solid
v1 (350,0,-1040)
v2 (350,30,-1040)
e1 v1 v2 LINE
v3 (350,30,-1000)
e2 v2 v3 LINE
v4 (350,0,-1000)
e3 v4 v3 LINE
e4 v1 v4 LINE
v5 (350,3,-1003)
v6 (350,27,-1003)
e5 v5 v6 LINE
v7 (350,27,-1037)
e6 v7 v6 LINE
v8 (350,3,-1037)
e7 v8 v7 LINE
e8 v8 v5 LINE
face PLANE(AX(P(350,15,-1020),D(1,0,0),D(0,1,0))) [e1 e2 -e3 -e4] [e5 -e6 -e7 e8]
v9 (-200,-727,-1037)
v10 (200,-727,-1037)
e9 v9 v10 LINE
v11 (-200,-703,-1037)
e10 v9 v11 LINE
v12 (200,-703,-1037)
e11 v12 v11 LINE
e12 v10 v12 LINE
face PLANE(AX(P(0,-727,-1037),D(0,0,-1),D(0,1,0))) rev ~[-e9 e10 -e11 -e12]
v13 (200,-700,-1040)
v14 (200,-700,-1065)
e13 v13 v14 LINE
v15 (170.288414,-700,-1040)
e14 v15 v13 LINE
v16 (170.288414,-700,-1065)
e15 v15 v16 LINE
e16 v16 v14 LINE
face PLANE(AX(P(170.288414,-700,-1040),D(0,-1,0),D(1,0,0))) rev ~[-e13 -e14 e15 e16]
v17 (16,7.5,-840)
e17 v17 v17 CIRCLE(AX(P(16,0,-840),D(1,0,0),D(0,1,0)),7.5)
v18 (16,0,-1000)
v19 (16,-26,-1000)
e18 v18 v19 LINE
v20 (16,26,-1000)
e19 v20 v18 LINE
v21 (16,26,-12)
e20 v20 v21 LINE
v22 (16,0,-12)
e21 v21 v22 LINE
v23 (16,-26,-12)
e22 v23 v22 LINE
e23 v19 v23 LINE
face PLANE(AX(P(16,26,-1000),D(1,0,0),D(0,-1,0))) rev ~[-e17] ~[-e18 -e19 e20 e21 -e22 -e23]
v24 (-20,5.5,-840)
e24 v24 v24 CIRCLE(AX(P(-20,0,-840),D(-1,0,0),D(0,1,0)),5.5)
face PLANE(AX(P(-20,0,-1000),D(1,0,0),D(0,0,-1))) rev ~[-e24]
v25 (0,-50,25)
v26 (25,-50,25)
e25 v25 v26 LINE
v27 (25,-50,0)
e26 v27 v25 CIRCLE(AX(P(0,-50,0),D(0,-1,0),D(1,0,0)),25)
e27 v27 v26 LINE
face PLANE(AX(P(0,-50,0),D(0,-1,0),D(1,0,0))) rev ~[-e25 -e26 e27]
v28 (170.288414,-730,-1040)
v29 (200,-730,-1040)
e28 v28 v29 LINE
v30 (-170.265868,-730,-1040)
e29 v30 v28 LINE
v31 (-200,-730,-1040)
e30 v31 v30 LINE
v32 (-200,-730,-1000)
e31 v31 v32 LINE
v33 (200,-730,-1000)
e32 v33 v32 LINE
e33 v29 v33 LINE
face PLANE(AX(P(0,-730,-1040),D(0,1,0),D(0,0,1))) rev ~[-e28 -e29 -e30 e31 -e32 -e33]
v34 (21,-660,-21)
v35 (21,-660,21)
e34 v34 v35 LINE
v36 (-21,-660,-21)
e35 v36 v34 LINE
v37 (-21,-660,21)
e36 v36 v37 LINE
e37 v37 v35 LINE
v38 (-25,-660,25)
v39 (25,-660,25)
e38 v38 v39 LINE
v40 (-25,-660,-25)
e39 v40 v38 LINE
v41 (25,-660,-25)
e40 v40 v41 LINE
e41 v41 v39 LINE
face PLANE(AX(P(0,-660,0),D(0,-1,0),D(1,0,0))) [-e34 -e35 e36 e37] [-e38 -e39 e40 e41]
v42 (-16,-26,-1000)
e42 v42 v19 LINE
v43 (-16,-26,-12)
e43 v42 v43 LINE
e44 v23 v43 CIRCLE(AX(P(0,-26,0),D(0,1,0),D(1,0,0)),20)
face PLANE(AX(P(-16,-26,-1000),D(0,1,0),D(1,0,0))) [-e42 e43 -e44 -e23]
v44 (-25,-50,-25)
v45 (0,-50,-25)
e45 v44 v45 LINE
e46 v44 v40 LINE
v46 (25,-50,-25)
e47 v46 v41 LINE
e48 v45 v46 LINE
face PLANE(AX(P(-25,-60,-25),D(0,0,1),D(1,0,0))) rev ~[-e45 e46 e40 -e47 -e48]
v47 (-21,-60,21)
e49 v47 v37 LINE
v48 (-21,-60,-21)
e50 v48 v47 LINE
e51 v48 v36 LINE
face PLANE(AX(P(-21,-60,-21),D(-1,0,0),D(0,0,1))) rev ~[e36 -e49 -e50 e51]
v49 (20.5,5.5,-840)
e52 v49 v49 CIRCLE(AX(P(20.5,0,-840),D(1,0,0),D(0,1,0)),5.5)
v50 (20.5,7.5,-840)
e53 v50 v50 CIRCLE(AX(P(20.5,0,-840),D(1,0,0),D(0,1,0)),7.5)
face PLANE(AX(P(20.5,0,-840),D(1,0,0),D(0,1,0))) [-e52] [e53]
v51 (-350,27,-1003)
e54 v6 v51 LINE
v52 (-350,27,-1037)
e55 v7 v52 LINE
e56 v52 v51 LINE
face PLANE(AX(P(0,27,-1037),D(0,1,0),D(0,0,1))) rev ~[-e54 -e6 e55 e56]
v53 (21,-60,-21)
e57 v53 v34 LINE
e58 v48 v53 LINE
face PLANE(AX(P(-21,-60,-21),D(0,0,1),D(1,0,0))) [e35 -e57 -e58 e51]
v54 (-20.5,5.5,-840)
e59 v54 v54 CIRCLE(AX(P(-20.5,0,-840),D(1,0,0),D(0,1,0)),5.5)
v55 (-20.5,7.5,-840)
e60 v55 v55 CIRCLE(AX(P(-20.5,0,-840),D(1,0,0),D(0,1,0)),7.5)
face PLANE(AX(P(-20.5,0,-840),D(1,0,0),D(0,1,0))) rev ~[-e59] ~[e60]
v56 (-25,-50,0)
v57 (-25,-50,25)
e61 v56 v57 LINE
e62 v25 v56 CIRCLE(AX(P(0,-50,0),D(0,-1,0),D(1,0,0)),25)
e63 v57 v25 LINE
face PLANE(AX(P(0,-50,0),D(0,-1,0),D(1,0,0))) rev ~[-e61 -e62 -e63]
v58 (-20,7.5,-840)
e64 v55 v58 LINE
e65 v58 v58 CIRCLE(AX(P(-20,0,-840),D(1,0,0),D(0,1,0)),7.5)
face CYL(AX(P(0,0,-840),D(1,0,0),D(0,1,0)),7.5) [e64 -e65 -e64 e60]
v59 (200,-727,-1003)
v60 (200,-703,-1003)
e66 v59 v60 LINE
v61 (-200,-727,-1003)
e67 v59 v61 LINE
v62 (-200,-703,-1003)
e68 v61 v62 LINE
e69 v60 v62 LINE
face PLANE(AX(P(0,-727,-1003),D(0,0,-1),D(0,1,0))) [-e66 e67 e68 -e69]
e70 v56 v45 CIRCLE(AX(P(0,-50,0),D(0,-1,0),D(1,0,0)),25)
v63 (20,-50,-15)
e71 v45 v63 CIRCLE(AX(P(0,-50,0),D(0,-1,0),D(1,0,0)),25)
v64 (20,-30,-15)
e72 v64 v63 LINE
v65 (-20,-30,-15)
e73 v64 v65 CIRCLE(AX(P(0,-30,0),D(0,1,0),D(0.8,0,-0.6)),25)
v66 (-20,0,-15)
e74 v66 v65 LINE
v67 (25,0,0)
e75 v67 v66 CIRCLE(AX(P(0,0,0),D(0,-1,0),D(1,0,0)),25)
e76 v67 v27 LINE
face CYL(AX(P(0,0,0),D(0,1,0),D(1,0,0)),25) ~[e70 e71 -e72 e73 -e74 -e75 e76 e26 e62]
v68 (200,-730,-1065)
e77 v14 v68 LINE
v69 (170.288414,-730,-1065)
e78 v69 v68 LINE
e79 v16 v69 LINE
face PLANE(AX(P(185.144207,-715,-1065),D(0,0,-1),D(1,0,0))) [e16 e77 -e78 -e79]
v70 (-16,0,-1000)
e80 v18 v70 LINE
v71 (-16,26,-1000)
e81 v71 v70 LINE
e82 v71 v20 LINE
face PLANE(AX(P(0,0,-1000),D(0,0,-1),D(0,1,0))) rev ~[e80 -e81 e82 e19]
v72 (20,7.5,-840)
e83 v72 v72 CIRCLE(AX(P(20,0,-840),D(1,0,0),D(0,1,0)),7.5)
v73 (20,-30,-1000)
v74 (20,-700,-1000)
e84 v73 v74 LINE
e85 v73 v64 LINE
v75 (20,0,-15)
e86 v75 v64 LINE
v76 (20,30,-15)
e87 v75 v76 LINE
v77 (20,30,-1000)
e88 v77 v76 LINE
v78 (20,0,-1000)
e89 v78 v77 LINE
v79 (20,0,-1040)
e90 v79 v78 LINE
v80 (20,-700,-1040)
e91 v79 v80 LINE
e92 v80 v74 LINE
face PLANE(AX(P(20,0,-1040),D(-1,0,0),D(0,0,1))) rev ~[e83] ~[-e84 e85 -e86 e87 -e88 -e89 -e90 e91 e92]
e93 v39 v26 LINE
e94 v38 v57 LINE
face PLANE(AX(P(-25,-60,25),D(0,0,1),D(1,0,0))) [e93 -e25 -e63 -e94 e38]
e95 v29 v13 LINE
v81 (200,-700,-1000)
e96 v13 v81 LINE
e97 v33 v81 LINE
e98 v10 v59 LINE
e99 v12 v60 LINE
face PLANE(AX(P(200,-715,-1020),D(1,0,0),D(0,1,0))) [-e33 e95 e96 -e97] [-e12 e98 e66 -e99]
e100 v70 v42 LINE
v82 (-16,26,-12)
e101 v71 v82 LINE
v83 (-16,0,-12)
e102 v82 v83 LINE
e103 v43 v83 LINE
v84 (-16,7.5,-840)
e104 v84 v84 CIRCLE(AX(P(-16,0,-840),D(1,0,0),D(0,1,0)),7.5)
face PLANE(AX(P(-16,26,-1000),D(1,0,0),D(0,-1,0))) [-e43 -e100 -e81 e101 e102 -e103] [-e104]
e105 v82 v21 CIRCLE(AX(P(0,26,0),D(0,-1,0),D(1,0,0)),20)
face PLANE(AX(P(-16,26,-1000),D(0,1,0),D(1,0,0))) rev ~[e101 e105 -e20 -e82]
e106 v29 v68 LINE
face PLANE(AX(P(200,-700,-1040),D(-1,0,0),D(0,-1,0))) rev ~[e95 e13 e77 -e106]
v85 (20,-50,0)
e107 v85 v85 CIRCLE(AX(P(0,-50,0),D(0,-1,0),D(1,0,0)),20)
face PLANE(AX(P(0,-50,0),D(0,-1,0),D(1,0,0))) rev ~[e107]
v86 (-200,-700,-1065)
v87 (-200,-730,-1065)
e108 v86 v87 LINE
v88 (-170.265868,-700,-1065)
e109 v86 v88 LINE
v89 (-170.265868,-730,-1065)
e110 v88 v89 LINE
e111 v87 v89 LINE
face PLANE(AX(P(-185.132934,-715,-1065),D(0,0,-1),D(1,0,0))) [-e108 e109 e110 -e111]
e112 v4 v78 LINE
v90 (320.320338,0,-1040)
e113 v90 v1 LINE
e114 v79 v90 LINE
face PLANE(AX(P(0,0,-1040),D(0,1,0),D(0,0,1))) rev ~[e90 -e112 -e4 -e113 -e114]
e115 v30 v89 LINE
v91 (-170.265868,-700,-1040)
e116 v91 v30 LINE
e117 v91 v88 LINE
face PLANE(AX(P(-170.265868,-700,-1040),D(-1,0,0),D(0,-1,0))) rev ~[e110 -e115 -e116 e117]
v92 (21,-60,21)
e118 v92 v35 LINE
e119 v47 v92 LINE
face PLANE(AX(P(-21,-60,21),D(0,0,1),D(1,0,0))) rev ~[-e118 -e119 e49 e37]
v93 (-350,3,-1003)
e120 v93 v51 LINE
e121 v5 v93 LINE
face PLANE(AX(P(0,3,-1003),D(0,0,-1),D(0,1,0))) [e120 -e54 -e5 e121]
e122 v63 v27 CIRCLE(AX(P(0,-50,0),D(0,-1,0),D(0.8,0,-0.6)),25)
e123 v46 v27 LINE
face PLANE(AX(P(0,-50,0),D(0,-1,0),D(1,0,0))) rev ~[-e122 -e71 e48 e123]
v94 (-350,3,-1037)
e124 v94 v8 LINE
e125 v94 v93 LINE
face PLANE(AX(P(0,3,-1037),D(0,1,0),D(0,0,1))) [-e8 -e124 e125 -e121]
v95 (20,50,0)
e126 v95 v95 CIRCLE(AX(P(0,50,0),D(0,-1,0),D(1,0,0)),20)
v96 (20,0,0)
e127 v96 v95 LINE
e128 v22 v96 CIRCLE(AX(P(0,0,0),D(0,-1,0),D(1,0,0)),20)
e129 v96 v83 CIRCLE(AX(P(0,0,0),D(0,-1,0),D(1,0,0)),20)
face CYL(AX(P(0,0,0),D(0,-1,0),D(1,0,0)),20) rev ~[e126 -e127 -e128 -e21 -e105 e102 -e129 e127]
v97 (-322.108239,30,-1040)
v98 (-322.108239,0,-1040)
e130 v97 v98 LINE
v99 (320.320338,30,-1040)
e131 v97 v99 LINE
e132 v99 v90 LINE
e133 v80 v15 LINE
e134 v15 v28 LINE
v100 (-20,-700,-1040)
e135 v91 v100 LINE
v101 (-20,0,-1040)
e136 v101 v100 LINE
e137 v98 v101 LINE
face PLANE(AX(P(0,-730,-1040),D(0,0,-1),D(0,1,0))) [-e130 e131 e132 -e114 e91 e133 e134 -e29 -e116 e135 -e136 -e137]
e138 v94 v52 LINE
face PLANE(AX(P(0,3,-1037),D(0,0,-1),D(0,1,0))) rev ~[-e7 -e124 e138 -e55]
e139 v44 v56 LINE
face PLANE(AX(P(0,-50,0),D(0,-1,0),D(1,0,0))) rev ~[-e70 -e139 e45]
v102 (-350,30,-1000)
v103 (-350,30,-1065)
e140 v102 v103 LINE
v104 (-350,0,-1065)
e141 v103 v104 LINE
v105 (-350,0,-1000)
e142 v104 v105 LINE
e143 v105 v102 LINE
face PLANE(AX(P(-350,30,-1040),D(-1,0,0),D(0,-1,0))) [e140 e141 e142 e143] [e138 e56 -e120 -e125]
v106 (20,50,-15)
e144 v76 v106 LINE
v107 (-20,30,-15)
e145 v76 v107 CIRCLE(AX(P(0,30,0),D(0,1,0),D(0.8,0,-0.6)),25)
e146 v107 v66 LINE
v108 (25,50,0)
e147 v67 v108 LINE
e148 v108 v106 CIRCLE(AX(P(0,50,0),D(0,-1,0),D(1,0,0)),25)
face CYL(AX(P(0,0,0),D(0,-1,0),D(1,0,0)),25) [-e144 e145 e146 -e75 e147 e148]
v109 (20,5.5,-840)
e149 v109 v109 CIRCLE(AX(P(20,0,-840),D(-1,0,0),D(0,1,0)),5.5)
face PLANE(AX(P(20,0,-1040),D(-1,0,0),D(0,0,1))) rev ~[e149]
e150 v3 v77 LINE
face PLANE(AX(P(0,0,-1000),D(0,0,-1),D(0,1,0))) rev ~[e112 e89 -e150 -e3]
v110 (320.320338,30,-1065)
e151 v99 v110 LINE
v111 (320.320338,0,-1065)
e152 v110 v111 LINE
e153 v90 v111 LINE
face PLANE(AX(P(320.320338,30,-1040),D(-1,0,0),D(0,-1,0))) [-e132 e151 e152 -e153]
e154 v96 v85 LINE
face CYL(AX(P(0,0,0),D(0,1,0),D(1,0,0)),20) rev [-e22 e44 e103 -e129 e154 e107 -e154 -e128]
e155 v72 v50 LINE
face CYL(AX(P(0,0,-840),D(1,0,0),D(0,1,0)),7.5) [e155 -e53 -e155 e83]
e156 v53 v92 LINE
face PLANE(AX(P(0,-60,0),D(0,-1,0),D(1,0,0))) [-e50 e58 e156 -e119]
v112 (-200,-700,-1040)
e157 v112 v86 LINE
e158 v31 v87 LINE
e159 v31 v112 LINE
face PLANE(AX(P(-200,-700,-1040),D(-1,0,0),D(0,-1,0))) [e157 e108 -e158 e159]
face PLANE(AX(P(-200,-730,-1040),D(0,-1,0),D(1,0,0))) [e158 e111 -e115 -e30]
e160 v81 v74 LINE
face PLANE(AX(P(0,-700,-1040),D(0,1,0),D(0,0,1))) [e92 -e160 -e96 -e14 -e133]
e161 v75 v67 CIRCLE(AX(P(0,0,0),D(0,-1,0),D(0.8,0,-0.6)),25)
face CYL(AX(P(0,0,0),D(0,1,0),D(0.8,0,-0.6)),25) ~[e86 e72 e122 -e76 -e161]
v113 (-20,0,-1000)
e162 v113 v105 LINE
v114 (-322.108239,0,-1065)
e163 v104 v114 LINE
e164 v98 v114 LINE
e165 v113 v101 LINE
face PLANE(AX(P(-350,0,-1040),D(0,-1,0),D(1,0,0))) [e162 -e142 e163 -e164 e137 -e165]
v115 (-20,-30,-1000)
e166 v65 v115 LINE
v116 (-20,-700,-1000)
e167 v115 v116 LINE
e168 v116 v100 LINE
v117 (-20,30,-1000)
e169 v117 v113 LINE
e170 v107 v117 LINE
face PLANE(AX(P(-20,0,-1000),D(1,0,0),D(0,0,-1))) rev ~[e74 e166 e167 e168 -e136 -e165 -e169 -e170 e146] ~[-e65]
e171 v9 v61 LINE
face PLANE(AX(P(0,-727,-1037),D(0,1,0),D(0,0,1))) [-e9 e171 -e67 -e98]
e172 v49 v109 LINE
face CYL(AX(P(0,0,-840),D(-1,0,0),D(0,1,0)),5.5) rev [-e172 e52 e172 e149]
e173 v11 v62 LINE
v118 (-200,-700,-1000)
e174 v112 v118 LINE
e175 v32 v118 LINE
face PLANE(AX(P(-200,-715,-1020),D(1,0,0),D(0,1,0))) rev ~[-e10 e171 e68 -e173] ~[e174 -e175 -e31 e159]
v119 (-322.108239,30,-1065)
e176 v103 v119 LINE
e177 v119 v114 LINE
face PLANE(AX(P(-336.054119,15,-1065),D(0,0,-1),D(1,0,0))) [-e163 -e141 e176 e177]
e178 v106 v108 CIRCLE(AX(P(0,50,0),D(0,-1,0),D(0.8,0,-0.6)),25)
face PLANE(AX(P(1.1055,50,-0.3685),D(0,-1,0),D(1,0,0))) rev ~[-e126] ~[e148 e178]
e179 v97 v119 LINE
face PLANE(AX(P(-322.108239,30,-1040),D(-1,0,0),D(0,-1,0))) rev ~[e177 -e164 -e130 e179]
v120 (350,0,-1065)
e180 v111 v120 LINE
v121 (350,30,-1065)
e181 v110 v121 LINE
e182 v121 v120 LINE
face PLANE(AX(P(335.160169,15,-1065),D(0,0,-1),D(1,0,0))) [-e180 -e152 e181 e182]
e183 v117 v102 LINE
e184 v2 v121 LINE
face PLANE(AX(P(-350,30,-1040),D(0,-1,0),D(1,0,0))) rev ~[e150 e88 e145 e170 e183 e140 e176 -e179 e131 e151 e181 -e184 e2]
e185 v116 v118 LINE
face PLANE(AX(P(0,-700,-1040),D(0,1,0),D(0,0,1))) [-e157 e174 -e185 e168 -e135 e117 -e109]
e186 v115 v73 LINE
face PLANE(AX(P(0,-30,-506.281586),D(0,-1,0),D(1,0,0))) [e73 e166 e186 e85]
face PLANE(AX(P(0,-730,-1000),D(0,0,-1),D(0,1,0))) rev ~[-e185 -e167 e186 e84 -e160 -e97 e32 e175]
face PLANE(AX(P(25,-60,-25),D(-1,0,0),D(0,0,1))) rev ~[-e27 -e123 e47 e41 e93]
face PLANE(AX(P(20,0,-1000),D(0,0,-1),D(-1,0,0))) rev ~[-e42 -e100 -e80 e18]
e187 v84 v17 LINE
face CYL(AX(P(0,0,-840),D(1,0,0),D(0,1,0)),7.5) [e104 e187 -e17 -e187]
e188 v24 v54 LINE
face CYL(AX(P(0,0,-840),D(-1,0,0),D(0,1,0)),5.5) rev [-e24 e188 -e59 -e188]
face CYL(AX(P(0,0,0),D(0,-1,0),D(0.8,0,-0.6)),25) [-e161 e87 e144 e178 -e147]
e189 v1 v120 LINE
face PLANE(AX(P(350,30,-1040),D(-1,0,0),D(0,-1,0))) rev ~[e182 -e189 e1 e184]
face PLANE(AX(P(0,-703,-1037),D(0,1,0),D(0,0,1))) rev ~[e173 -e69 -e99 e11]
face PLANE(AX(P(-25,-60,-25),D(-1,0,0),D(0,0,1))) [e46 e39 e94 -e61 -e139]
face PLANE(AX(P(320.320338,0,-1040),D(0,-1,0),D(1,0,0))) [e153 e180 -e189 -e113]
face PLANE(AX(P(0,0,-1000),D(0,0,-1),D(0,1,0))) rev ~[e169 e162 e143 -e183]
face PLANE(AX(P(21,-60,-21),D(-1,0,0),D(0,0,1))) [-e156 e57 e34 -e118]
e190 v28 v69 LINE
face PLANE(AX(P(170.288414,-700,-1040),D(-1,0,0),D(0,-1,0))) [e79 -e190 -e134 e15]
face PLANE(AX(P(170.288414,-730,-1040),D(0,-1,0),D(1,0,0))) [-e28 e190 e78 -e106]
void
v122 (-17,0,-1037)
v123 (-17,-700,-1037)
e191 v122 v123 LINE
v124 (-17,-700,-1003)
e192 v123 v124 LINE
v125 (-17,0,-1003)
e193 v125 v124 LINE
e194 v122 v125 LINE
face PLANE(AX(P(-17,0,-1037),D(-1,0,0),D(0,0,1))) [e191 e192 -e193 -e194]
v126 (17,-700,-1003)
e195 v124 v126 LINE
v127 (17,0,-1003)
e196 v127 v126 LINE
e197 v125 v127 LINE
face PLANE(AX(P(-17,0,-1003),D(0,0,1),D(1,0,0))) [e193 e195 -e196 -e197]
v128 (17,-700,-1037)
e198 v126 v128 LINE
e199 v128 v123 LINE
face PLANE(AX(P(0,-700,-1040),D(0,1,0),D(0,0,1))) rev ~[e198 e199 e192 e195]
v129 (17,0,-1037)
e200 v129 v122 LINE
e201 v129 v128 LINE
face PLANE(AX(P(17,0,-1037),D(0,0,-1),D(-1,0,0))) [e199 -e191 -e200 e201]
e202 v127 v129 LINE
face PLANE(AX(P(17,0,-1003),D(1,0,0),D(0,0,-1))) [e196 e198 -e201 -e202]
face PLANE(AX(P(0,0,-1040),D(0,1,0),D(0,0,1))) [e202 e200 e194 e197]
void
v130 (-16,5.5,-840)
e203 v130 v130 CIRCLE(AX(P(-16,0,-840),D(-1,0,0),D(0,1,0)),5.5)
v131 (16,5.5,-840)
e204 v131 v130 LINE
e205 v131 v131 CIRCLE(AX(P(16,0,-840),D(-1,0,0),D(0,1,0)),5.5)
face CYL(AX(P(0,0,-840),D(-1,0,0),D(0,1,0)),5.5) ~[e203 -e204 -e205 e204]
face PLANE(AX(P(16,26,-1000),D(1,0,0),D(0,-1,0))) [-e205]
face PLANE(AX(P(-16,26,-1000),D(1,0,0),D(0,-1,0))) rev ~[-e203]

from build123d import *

# Parameters (mm, degrees)
F0_R      = 20
F1_DEPTH  = 50
F2_DEPTH  = 30
F3_W      = 32
F3_H      = 52
F4_DEPTH  = 988.001
F5_W      = 30
F5_H      = 40
F5_W_2    = 24
F5_H_2    = 34
F6_DEPTH  = 350
F8_DEPTH  = 700
F9_DEPTH  = 200
F10_W     = 27.8917610645
F10_H     = 30
F10_W_2   = 29.6796619892
F10_W_3   = 29.7341316938
F10_W_4   = 29.711586237
F11_DEPTH = 25
F12_W     = 50
F12_H     = 50
F13_DEPTH = 10
F14_W     = 50
F14_H     = 50
F14_W_2   = 42
F14_H_2   = 42
F15_DEPTH = 600
F16_R     = 7.5
F16_R_2   = 5.5
F17_DEPTH = 20.5


# Not quite as in the source:
# - the program builds the solid bodies; features that only make, move or delete a surface that nothing else refers to are left out


with BuildPart() as f1:
    # F0 (on Front) → F1 (new body, symmetric)
    with BuildSketch(Plane.XZ):
        with BuildLine():
            ThreePointArc((20, -15), (23.7170824513, -7.9056941504), (25, 0))
            ThreePointArc((25, 0), (-7.9056941504, 23.7170824513), (-20, -15))
            ThreePointArc((-20, -15), (0, -25), (20, -15))
        make_face()
        Circle(F0_R, mode=Mode.SUBTRACT)
    extrude(amount=F1_DEPTH, both=True)

    # F0 (on Front) → F2 (join, symmetric)
    with BuildSketch(Plane.XZ):
        with BuildLine():
            ThreePointArc((20, -15), (0, -25), (-20, -15))
            Line((-20, -15), (-20, -1000))
            Line((-20, -1000), (20, -1000))
            Line((20, -1000), (20, -15))
        make_face()
    extrude(amount=F2_DEPTH, both=True)

    # F3 (on face) → F4 (cut, through all)
    with BuildSketch(Plane(origin=(0, 0, -1000), x_dir=(1, 0, 0), z_dir=(0, 0, -1))):
        Rectangle(F3_W, F3_H)
    extrude(amount=-F4_DEPTH, mode=Mode.SUBTRACT)

    # F5 (on Right) → F6 (join, symmetric)
    with BuildSketch(Plane.YZ):
        with Locations((15, -1020)):
            Rectangle(F5_W, F5_H)
        with Locations((15, -1020)):
            Rectangle(F5_W_2, F5_H_2, mode=Mode.SUBTRACT)
    extrude(amount=F6_DEPTH, both=True)

    # F7 (on face) → F8 (join)
    with BuildSketch(Plane.XZ):
        Polygon((-16, -1000), (-20, -1000), (-20, -1020), (-20, -1040), (20, -1040), (20, -1000), (16, -1000), align=None)
        Polygon((-17, -1037), (-17, -1020), (-17, -1003), (17, -1003), (17, -1037), align=None, mode=Mode.SUBTRACT)
    extrude(amount=F8_DEPTH)

    # F5 (on Right) → F9 (join, symmetric)
    with BuildSketch(Plane.YZ):
        with Locations((-715, -1020)):
            Rectangle(F5_W, F5_H)
        with Locations((-715, -1020)):
            Rectangle(F5_W_2, F5_H_2, mode=Mode.SUBTRACT)
    extrude(amount=F9_DEPTH, both=True)

    # F10 (on face) → F11 (join)
    with BuildSketch(Plane(origin=(0, 0, -1040), x_dir=(1, 0, 0), z_dir=(0, 0, -1))):
        with Locations((-336.0541194677, -15)):
            Rectangle(F10_W, F10_H)
        with Locations((335.1601690054, -15)):
            Rectangle(F10_W_2, F10_H)
        with Locations((-185.1329341531, 715)):
            Rectangle(F10_W_3, F10_H)
        with Locations((185.1442068815, 715)):
            Rectangle(F10_W_4, F10_H)
    extrude(amount=F11_DEPTH)

    # F12 (on face) → F13 (join)
    with BuildSketch(Plane.XZ.offset(50)):
        Rectangle(F12_W, F12_H)
    extrude(amount=F13_DEPTH)

    # F14 (on face) → F15 (join)
    with BuildSketch(Plane.XZ.offset(60)):
        Rectangle(F14_W, F14_H)
        Rectangle(F14_W_2, F14_H_2, mode=Mode.SUBTRACT)
    extrude(amount=F15_DEPTH)

    # F16 (on Right) → F17 (join, symmetric)
    with BuildSketch(Plane.YZ):
        with Locations((0, -840)):
            Circle(F16_R)
        with Locations((0, -840)):
            Circle(F16_R_2, mode=Mode.SUBTRACT)
    extrude(amount=F17_DEPTH, both=True)


solid = f1.part
